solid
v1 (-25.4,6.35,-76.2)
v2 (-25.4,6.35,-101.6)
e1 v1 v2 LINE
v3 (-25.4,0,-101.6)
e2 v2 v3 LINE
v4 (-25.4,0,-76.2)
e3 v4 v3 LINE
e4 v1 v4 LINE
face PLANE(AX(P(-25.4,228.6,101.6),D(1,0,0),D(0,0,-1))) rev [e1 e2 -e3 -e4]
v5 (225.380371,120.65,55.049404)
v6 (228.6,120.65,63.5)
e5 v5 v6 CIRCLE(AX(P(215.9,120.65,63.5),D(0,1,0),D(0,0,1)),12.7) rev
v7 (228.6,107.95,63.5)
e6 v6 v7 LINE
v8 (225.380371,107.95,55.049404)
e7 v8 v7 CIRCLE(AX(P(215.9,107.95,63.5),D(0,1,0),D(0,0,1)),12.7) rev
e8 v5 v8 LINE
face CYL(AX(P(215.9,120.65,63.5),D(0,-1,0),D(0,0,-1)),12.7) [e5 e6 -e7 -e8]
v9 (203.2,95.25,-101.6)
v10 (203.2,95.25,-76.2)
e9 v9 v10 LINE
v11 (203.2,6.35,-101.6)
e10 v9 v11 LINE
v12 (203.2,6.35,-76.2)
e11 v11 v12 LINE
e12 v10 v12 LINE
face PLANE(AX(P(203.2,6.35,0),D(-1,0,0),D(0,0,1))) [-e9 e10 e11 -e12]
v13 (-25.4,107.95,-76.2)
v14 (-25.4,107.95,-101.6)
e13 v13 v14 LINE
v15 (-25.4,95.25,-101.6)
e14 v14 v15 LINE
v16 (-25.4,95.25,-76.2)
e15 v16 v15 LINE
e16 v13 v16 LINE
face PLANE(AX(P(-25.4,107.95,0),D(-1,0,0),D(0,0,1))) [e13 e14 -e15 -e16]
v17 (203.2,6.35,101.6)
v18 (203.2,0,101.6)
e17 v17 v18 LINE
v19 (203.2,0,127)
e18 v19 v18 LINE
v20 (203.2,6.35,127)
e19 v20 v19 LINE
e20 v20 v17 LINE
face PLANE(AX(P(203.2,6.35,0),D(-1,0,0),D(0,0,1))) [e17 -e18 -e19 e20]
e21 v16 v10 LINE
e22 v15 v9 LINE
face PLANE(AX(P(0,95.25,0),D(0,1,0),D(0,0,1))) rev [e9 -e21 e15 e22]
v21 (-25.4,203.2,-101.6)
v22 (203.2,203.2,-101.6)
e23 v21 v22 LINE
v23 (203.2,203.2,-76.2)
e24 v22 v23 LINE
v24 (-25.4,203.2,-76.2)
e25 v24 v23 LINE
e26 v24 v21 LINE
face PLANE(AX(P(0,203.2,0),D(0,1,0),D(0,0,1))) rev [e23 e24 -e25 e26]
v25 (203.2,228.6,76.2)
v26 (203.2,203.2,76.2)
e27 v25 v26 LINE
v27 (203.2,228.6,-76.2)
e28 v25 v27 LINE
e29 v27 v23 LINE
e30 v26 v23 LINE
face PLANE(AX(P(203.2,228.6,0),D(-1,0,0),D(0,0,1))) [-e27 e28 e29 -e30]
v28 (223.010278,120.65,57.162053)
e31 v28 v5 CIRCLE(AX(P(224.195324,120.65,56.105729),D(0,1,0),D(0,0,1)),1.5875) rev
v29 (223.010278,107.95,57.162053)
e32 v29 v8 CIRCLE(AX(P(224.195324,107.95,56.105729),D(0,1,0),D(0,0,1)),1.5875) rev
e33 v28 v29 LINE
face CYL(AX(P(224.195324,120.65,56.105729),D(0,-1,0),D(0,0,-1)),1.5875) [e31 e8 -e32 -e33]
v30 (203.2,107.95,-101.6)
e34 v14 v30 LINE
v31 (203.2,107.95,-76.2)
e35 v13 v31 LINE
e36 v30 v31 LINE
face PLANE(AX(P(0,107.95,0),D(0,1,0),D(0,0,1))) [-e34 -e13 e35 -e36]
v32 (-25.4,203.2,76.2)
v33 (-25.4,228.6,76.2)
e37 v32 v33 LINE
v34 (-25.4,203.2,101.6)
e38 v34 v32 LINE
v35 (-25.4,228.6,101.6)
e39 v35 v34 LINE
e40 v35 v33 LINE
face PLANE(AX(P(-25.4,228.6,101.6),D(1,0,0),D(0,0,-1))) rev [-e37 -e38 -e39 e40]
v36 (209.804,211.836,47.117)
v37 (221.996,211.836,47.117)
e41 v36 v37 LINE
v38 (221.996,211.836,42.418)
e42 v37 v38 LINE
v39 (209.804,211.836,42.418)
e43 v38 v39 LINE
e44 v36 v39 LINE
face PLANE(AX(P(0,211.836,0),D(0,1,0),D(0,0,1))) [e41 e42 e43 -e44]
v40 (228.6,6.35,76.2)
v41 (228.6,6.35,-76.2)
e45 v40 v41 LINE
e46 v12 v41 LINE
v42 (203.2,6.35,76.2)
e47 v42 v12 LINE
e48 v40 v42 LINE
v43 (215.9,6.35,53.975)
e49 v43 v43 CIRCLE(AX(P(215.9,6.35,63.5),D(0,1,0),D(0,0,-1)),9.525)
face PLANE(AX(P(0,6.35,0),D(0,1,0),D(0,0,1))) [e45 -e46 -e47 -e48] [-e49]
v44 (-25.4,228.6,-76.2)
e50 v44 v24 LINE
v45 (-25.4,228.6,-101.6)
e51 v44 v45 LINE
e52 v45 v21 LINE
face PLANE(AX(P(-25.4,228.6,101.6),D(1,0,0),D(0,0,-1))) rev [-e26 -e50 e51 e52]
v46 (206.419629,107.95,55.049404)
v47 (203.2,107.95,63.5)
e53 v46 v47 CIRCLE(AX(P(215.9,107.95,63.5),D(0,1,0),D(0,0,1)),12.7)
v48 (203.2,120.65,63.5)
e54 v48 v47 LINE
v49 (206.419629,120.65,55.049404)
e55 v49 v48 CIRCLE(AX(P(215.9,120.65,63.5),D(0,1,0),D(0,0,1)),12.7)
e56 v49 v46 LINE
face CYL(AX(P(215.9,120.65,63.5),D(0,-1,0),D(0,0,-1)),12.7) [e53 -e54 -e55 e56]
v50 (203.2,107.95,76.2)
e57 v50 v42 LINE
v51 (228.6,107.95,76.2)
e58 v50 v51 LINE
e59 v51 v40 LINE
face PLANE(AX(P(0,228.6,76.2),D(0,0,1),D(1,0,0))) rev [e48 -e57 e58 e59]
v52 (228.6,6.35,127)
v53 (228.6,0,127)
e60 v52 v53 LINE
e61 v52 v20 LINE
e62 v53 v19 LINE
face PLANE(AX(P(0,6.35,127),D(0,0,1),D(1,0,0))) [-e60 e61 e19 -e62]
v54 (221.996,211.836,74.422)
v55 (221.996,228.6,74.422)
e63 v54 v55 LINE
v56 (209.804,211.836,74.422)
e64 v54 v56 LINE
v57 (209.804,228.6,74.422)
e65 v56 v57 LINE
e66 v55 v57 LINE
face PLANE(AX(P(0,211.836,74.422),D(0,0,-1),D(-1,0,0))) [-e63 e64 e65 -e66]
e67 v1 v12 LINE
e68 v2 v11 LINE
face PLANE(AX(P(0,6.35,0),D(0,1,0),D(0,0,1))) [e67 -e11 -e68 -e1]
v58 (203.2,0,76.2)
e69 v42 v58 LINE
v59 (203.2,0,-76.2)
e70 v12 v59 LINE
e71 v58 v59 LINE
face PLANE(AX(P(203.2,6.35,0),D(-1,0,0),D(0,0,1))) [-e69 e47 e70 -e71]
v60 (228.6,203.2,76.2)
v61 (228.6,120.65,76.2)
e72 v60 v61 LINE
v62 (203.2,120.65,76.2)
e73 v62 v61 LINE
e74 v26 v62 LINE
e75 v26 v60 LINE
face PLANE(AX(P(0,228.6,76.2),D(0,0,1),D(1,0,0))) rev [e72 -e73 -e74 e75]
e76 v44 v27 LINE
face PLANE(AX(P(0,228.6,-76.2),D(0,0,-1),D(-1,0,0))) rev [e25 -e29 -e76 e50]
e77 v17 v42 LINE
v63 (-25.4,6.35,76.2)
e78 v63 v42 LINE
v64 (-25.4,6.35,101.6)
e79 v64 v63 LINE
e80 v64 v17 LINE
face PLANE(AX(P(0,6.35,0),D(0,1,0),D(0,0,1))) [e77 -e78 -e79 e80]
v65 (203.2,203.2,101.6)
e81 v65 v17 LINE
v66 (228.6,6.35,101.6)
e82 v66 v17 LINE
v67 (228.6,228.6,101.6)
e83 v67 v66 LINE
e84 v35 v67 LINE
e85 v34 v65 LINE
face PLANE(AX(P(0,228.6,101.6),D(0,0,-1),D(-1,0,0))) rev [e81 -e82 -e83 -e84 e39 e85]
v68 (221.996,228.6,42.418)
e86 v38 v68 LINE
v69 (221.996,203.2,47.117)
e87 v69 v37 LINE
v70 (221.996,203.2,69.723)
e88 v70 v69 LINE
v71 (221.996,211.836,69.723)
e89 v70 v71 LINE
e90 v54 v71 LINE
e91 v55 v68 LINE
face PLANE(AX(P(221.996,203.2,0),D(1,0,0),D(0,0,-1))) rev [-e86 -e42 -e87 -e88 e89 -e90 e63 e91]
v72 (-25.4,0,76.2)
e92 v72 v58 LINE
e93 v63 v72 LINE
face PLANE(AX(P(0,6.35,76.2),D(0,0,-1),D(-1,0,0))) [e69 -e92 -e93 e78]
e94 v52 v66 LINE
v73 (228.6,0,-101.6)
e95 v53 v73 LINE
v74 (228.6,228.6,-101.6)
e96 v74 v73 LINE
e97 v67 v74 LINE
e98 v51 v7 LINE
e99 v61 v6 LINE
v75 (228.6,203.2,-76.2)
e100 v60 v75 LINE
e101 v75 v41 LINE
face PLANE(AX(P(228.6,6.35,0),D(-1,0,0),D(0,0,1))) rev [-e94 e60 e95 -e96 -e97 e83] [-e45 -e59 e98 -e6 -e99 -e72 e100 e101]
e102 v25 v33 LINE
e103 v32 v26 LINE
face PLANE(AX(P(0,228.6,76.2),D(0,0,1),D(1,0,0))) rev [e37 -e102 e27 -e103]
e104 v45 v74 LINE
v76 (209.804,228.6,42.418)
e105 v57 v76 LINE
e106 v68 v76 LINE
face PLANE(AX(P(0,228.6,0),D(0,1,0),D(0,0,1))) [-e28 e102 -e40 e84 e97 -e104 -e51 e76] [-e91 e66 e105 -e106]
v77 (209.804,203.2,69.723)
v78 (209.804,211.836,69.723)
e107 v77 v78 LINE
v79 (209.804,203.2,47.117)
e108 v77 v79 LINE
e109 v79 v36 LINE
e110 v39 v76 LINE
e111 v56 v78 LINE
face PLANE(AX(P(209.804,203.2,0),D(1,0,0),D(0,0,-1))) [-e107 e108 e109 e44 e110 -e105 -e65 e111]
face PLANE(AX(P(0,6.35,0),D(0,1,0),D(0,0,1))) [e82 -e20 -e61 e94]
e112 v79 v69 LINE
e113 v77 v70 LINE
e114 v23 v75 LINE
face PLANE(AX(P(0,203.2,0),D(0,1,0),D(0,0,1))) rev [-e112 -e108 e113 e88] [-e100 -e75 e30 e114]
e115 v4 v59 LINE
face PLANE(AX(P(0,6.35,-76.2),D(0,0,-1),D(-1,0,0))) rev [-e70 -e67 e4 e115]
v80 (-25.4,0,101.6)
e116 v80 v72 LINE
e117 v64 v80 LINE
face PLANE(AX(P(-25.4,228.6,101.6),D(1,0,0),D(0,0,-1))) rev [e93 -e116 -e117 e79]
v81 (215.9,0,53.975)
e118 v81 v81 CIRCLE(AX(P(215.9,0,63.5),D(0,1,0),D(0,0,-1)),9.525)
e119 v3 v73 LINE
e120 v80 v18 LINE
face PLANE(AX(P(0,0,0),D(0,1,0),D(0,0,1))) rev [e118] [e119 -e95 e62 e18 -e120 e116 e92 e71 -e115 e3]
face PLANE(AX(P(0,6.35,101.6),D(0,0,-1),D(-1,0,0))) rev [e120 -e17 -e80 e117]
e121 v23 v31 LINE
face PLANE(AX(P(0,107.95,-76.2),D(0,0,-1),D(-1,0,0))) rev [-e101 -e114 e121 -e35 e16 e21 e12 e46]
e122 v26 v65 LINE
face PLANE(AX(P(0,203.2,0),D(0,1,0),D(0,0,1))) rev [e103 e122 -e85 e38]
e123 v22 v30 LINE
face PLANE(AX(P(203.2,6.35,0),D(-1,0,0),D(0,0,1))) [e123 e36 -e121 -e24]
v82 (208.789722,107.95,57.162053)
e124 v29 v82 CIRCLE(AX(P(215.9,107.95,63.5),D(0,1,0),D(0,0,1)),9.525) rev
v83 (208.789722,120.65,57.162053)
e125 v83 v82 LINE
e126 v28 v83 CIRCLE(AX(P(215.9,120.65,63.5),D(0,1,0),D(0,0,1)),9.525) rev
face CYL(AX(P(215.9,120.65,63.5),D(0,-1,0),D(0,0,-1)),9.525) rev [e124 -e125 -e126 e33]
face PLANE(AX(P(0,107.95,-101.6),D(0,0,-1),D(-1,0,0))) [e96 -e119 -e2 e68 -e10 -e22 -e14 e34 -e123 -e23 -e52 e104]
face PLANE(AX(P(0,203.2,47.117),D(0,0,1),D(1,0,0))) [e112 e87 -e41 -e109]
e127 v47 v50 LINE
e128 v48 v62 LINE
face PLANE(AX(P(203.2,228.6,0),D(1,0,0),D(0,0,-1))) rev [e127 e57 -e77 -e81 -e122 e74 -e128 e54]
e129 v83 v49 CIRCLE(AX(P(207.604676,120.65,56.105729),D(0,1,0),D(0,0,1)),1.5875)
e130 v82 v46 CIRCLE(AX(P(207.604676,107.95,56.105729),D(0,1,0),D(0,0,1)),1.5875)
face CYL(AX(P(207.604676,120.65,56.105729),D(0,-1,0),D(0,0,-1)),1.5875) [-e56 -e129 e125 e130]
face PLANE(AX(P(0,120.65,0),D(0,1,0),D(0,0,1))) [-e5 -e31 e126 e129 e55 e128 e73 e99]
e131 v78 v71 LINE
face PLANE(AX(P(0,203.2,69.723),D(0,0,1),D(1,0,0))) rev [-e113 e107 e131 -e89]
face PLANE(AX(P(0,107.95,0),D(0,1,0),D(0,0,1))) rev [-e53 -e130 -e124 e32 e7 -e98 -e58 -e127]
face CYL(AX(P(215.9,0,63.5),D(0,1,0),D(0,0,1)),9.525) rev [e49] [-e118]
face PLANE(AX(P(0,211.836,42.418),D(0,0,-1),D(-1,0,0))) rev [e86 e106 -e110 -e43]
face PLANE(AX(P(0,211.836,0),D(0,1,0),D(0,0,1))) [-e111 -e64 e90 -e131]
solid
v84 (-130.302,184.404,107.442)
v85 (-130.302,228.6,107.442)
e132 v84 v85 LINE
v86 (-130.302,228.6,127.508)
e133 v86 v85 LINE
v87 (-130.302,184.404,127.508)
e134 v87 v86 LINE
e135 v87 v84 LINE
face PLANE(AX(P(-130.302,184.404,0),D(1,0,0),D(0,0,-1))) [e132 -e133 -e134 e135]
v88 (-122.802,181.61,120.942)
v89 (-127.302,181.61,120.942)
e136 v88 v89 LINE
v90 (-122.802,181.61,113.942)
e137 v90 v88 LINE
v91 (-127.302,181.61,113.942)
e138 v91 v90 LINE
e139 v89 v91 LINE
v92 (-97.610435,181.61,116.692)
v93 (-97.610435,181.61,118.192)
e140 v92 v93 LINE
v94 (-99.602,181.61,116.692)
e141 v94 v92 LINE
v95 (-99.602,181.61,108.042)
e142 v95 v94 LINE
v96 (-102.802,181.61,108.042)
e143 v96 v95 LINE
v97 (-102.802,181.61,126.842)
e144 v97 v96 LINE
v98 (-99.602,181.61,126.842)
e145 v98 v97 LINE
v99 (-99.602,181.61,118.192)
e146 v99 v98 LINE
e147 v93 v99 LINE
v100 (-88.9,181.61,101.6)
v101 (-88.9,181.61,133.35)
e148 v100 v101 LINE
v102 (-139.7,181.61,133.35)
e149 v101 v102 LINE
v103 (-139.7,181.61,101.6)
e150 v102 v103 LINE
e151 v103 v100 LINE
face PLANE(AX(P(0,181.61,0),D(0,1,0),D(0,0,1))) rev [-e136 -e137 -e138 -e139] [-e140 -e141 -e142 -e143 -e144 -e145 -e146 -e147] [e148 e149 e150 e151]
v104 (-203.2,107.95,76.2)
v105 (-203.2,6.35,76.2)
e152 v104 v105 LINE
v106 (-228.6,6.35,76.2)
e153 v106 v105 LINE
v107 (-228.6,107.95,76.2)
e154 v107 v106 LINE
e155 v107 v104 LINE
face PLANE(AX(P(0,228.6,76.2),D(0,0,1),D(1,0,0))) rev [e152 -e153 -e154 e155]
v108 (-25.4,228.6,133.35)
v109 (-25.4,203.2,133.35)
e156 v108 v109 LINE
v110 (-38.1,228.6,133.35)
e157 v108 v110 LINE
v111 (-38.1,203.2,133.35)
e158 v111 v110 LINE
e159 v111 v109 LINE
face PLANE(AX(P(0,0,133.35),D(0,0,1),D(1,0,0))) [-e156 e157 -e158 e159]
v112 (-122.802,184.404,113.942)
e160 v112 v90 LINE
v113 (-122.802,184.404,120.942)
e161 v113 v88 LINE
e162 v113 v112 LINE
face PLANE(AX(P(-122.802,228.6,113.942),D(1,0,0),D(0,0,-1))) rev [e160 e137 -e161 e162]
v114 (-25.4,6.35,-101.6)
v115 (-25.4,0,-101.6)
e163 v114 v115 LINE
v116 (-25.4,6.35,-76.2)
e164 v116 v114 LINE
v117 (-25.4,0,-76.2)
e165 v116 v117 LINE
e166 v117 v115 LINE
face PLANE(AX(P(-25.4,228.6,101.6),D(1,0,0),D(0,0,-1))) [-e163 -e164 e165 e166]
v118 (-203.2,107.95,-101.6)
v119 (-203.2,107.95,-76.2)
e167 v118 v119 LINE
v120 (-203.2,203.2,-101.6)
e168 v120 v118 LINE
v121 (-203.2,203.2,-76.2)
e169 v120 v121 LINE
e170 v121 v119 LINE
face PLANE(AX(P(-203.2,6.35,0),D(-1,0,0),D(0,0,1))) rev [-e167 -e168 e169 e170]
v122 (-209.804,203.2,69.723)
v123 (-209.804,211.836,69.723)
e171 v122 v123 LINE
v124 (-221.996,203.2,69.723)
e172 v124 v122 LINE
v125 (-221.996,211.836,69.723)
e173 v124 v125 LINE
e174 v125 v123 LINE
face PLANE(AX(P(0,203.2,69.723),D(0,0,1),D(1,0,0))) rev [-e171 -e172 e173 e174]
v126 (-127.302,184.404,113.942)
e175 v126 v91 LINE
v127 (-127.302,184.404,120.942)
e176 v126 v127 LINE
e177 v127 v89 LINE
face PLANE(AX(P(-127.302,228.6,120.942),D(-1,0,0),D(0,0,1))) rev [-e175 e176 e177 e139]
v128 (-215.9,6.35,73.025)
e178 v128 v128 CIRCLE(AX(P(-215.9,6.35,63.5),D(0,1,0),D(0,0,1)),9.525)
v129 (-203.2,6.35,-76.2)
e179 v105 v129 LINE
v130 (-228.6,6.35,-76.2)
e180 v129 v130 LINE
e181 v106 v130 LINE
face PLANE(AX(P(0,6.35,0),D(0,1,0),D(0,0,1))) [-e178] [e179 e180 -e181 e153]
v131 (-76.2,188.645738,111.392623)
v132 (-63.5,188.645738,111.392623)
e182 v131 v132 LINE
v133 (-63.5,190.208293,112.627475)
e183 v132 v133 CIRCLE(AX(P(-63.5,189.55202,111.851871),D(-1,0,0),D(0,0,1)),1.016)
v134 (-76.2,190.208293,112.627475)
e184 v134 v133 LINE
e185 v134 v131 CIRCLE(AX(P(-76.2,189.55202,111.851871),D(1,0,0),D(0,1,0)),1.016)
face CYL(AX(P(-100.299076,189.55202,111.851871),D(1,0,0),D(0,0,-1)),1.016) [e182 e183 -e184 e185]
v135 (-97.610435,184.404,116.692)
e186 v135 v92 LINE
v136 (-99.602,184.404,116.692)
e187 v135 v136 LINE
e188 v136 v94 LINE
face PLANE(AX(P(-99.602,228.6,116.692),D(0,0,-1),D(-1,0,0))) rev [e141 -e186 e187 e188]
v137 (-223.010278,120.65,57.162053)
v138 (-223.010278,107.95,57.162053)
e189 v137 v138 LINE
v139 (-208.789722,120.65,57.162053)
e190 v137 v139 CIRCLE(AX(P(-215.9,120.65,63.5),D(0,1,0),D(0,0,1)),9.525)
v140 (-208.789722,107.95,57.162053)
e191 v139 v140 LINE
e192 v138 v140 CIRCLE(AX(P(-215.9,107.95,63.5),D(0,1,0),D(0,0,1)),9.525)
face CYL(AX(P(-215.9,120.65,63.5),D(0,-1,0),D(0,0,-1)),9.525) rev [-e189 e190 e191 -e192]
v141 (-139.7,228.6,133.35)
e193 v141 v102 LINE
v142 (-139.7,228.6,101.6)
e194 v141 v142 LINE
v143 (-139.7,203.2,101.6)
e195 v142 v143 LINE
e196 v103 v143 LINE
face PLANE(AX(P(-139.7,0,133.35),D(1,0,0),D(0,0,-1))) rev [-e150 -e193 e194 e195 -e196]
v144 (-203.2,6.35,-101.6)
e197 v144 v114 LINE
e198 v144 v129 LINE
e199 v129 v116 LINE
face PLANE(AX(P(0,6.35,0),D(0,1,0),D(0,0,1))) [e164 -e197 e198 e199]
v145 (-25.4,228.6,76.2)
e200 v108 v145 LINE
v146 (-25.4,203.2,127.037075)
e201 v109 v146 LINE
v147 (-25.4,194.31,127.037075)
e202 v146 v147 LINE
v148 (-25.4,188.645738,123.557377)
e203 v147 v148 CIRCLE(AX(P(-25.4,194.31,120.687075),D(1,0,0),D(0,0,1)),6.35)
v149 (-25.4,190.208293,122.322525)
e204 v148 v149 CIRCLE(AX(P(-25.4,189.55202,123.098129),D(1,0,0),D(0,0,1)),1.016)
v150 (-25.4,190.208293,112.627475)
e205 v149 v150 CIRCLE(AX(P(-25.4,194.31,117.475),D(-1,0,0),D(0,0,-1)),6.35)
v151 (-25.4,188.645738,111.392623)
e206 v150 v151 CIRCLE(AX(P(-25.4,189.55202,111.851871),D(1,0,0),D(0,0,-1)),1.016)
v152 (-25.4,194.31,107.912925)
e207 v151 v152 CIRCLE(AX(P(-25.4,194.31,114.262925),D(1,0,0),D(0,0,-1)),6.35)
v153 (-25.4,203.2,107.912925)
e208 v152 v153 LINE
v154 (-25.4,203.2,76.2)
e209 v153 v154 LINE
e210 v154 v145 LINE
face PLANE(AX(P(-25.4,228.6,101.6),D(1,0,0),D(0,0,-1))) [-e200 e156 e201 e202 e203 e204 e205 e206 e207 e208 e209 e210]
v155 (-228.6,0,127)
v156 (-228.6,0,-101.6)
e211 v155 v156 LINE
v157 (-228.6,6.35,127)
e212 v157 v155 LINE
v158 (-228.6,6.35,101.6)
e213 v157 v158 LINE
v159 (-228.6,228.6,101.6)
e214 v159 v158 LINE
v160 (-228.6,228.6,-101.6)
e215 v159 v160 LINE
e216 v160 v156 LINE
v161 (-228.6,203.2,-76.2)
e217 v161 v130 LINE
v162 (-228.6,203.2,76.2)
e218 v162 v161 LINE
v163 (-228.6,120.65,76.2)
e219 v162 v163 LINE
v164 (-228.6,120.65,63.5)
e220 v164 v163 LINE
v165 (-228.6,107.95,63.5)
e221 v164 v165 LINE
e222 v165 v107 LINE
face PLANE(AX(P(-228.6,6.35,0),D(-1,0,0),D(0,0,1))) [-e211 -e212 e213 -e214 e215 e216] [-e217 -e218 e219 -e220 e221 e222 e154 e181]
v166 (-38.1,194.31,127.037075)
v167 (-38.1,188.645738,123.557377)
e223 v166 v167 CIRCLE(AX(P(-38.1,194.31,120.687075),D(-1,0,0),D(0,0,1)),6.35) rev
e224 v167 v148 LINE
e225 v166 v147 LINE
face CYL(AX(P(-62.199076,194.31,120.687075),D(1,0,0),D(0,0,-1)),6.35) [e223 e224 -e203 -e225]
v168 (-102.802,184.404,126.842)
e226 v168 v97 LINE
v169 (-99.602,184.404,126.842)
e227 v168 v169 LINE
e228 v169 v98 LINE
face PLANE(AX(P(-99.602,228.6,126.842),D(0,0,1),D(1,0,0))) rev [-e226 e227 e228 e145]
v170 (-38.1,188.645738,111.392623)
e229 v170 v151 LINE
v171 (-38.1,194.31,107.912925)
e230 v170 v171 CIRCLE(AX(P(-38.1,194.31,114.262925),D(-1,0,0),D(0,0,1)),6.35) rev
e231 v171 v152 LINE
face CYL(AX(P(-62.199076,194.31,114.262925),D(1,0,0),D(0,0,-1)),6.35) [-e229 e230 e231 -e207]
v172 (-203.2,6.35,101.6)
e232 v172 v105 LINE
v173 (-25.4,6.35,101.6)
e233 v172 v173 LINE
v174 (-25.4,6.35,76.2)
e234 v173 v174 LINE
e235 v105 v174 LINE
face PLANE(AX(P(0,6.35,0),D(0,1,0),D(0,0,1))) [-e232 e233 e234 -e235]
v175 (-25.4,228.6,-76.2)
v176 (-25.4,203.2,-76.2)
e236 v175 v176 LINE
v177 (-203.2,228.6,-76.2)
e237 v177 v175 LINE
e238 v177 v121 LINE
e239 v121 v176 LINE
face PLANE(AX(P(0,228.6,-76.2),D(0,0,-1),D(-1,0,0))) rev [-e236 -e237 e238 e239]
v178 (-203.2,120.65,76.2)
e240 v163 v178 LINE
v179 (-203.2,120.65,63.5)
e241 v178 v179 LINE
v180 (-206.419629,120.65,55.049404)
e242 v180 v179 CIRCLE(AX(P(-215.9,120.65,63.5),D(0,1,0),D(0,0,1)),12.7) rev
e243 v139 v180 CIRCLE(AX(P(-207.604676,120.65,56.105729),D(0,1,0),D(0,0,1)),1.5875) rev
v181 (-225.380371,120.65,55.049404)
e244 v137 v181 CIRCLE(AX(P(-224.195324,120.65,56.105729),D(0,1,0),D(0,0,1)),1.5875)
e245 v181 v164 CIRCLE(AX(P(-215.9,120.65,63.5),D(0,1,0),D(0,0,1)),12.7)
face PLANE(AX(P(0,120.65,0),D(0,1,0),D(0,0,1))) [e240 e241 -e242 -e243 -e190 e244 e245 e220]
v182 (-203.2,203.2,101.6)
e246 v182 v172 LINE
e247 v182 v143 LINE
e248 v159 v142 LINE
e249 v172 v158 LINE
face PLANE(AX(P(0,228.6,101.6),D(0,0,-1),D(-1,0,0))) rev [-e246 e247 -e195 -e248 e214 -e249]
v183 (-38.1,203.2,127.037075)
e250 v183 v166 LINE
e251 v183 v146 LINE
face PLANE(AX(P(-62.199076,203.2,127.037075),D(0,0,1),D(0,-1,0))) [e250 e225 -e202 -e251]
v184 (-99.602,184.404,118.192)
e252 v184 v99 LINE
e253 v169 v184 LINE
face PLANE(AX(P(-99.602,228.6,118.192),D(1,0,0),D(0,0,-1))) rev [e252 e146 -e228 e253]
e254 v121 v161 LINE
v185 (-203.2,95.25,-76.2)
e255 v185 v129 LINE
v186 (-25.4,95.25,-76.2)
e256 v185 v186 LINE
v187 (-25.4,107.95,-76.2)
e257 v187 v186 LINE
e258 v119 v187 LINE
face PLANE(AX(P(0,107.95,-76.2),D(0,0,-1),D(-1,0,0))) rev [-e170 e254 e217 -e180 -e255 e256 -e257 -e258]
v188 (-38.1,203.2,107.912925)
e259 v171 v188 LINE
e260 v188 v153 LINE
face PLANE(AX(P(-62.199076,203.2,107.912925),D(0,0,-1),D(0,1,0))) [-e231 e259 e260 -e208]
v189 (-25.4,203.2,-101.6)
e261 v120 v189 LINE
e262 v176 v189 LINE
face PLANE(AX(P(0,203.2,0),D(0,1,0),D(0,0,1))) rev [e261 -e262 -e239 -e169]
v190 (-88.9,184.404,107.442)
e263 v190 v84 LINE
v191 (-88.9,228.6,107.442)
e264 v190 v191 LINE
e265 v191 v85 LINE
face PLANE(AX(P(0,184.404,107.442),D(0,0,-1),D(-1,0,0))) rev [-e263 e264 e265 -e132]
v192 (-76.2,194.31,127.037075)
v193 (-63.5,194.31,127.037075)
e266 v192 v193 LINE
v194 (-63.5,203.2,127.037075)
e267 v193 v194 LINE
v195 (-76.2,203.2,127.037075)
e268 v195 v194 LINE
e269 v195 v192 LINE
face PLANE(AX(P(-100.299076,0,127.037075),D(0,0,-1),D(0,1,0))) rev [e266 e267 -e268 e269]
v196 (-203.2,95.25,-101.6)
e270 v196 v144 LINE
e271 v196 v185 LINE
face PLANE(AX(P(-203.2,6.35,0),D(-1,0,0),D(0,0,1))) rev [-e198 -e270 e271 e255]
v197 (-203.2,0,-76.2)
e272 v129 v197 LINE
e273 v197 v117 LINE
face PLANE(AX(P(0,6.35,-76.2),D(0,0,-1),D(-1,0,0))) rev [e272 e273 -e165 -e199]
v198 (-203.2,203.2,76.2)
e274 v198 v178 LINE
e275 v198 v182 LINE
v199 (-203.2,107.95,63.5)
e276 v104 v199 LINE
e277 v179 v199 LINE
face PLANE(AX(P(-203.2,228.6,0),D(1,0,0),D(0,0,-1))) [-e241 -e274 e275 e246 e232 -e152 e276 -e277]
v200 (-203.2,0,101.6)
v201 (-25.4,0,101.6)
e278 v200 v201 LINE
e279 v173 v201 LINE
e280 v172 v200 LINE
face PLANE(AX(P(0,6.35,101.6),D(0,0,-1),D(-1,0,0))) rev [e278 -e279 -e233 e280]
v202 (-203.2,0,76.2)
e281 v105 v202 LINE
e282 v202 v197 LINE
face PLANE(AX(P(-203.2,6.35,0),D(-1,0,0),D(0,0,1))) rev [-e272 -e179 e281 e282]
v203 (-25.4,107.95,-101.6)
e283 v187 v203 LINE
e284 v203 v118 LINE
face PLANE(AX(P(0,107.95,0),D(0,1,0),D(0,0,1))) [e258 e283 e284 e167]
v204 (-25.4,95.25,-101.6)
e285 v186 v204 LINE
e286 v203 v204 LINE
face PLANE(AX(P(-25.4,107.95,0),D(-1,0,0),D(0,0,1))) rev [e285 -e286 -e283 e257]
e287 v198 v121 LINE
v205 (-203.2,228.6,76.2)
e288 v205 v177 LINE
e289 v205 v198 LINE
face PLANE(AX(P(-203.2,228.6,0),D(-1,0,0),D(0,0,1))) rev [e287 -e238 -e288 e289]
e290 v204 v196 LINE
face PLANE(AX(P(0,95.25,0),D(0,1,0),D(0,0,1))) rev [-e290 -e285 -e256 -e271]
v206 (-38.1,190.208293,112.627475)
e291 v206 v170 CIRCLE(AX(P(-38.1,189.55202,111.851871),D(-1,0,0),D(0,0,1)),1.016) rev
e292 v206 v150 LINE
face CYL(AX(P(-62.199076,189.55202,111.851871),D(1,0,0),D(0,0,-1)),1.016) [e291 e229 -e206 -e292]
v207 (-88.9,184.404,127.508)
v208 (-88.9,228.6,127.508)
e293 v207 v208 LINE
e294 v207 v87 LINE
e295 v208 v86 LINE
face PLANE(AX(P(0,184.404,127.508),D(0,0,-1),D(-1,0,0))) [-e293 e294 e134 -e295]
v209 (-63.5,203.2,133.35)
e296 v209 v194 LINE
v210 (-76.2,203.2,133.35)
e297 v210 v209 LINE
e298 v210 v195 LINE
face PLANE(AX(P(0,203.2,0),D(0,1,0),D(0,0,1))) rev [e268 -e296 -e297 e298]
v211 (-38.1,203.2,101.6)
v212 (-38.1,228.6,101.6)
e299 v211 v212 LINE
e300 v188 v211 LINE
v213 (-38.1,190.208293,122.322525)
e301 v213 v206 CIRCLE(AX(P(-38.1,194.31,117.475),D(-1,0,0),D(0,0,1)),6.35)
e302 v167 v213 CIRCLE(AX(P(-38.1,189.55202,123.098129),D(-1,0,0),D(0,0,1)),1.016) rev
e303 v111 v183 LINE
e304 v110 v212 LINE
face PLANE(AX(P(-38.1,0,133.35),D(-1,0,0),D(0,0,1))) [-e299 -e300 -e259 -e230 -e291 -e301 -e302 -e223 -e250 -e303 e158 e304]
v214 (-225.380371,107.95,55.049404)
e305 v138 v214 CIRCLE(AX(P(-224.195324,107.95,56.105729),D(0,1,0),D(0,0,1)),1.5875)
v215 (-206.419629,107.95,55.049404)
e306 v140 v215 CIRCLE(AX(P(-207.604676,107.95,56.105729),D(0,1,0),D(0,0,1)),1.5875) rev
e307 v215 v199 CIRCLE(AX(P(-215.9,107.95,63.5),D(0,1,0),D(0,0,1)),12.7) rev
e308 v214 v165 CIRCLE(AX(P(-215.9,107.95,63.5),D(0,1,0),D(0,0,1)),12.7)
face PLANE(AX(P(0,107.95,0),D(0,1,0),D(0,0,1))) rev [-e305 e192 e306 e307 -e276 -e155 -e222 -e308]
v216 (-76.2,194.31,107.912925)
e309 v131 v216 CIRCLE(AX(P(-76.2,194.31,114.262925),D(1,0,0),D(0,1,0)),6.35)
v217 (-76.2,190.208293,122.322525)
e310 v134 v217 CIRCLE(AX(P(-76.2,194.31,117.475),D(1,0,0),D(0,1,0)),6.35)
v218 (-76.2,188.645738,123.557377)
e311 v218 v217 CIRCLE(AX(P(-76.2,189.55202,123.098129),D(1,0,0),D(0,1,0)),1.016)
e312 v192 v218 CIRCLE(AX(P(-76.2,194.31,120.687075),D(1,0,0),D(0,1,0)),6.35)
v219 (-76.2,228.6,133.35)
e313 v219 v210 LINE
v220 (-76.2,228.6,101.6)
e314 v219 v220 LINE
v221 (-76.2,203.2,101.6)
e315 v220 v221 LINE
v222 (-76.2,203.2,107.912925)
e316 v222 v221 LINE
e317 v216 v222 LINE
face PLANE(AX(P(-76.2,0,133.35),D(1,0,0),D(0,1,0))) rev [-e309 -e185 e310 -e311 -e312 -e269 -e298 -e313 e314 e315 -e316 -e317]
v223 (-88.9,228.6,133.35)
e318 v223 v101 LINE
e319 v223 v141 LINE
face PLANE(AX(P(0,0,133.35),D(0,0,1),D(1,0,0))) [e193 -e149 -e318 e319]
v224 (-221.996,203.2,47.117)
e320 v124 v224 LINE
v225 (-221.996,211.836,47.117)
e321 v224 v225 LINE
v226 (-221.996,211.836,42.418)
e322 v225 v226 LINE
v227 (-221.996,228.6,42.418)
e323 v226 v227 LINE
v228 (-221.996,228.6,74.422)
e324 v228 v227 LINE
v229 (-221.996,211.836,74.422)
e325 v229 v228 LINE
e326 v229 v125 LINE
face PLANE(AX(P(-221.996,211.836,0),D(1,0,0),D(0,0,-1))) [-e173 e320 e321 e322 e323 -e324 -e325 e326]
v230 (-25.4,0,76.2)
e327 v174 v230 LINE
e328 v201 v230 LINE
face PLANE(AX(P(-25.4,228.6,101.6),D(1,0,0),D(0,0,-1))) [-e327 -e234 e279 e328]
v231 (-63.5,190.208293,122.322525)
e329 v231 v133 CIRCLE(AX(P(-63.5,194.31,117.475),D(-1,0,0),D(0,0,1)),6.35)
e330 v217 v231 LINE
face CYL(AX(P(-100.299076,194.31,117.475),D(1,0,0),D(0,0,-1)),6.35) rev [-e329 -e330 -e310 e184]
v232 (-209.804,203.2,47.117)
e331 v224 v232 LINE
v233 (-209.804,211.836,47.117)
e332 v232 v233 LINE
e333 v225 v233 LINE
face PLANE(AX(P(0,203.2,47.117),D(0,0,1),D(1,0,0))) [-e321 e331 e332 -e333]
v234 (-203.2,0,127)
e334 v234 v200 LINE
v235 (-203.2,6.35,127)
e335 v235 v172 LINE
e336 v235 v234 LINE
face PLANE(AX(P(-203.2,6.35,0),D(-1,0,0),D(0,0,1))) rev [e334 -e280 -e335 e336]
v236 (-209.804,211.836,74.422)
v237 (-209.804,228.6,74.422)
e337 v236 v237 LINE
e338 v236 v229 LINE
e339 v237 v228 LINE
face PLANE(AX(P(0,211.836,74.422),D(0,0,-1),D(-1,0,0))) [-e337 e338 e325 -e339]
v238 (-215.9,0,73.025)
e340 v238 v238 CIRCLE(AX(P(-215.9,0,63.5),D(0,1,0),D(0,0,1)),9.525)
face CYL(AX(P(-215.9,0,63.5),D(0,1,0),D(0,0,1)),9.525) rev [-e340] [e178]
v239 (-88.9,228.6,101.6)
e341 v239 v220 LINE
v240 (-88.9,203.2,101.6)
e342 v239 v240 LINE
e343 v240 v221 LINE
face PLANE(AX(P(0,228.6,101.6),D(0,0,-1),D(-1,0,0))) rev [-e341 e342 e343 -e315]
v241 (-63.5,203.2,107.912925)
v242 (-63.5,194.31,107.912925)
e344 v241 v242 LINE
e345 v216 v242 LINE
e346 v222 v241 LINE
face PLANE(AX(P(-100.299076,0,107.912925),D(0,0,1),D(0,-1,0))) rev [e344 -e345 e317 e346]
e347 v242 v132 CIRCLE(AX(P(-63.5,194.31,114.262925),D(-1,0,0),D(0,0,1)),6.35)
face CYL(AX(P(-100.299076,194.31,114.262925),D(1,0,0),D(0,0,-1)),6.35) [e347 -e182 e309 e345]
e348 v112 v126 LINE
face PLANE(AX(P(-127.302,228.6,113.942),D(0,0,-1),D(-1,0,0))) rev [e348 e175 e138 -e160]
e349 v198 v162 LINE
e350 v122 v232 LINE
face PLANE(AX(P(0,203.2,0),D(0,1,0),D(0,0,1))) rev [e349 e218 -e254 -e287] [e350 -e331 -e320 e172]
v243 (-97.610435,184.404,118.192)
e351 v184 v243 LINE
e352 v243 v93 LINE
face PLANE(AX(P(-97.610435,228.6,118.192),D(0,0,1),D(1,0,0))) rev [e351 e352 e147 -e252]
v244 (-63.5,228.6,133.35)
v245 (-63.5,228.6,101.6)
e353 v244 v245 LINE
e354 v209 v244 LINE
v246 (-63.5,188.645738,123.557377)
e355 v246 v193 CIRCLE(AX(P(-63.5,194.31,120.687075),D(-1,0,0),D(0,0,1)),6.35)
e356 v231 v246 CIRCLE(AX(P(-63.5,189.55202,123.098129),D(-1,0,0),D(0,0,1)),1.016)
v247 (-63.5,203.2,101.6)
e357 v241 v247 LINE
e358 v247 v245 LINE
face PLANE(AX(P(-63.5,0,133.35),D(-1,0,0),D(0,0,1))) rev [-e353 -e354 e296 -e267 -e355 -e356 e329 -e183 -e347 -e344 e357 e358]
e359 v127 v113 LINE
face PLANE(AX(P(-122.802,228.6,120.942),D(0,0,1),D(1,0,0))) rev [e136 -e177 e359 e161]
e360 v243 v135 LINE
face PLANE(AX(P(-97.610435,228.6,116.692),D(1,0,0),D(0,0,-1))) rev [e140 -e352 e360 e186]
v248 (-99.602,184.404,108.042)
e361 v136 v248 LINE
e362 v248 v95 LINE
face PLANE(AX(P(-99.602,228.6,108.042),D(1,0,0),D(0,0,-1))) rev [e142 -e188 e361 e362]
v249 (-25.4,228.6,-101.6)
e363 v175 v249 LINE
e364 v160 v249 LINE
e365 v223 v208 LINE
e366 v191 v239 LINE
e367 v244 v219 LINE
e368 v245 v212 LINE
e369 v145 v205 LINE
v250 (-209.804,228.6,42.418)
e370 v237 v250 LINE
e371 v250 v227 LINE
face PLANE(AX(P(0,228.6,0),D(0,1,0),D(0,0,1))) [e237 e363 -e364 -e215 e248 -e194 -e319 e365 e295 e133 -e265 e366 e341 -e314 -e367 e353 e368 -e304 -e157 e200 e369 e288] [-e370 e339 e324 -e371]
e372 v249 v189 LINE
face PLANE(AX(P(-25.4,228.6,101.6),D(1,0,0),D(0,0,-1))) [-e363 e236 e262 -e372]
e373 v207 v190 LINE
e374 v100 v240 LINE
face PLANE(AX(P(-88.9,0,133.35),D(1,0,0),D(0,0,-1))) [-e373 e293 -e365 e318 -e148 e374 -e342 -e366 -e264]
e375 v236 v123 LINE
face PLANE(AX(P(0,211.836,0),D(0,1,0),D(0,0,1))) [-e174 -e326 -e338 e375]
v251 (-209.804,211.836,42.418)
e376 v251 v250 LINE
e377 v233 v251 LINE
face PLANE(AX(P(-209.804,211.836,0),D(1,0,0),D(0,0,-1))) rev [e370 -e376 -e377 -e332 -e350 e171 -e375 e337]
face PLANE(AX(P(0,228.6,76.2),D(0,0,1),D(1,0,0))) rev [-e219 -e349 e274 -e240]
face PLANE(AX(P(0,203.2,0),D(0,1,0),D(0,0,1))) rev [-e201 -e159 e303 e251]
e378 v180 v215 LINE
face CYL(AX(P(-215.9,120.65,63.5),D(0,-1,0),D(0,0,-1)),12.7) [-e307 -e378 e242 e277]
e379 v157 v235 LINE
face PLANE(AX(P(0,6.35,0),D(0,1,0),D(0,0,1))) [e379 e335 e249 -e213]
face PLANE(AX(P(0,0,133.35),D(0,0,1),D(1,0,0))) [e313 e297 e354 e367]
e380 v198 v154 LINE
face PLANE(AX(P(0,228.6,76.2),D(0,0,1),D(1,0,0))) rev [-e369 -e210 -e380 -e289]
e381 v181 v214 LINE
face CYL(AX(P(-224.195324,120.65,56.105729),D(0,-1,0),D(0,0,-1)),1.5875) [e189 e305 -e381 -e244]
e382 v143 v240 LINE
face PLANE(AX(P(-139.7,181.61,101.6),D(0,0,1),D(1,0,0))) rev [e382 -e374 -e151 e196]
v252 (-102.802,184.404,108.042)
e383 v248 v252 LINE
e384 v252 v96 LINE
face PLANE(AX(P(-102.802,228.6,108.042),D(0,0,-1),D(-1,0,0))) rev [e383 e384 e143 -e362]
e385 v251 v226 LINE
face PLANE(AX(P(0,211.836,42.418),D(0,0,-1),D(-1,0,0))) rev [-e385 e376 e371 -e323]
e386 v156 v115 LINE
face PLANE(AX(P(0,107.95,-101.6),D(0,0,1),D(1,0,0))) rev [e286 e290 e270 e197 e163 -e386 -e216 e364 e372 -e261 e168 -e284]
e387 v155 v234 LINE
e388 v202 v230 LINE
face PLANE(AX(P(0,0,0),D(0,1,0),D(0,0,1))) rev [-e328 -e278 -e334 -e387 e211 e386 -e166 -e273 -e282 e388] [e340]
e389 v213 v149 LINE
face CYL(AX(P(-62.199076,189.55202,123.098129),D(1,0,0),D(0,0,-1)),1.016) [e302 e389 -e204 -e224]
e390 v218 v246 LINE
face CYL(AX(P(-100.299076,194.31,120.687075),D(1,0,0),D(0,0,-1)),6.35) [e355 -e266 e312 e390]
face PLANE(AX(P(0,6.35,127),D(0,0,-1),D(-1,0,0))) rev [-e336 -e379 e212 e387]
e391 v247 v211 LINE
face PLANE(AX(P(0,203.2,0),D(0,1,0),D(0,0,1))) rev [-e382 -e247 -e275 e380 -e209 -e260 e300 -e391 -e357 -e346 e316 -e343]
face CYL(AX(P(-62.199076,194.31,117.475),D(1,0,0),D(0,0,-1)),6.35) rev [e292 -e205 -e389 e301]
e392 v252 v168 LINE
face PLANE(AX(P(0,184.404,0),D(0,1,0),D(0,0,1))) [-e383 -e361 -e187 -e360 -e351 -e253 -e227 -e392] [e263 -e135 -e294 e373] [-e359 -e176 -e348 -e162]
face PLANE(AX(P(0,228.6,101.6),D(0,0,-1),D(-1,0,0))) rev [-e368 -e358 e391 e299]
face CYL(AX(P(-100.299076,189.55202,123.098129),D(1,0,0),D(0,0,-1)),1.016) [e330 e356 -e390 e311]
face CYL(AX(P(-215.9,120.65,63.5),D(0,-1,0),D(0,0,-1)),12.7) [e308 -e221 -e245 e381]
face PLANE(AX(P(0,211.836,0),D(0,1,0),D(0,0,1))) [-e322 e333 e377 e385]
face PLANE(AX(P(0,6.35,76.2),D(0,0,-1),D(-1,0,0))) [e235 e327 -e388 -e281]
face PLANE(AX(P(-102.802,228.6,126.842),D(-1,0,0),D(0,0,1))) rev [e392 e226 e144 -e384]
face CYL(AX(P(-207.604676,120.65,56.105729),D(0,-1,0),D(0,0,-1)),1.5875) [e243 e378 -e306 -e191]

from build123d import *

# Parameters (mm, degrees)
SKETCH1_W            = 25.4
SKETCH1_H            = 25.4
SKETCH1_W_2          = 406.4
SKETCH1_H_2          = 152.4
BOSS_EXTRUDE1_DEPTH  = 6.35
SKETCH1_4_W          = 25.4
SKETCH1_4_H          = 25.4
BOSS_EXTRUDE2_DEPTH  = 228.6
BOSS_EXTRUDE3_START  = 203.2
SKETCH1_5_W          = 406.4
SKETCH1_5_H          = 25.4
SKETCH1_5_W_2        = 25.4
SKETCH1_5_H_2        = 152.4
BOSS_EXTRUDE3_DEPTH  = 25.4
SKETCH2_W            = 50.8
SKETCH2_H            = 25.4
SKETCH2_W_2          = 12.7
BOSS_EXTRUDE4_DEPTH  = 31.75
SKETCH11_R           = 9.525
CUT_EXTRUDE6_DEPTH   = 346.594046534
SKETCH12_W           = 12.192
SKETCH12_H           = 22.606
SKETCH12_H_2         = 4.699
CUT_EXTRUDE7_DEPTH   = 16.764
SKETCH12_3_W         = 12.192
SKETCH12_3_H         = 22.606
CUT_EXTRUDE8_DEPTH   = 25.4
SKETCH13_W           = 12.192
SKETCH13_H           = 22.606
CUT_EXTRUDE9_DEPTH   = 25.4
SKETCH13_3_W         = 12.192
SKETCH13_3_H         = 4.699
CUT_EXTRUDE10_DEPTH  = 16.764
BOSS_EXTRUDE7_START  = 88.9
SKETCH14_W           = 177.8
SKETCH14_H           = 25.4
BOSS_EXTRUDE7_DEPTH  = 12.7
BOSS_EXTRUDE8_START  = 88.9
SKETCH14_3_W         = 228.6
SKETCH14_3_H         = 25.4
BOSS_EXTRUDE8_DEPTH  = 12.7
BOSS_EXTRUDE9_START  = 101.6
BOSS_EXTRUDE9_DEPTH  = 12.7
BOSS_EXTRUDE10_START = 101.6
BOSS_EXTRUDE10_DEPTH = 12.7
BOSS_EXTRUDE11_START = -12.7
BOSS_EXTRUDE11_DEPTH = 12.7
BOSS_EXTRUDE12_START = -38.1
BOSS_EXTRUDE12_DEPTH = 12.7
SKETCH18_W           = 50.8
SKETCH18_H           = 31.75
BOSS_EXTRUDE13_DEPTH = 21.59
SKETCH19_W           = 41.402
SKETCH19_H           = 20.066
CUT_EXTRUDE11_DEPTH  = 44.196
SKETCH20_W           = 4.5
SKETCH20_H           = 7
CUT_EXTRUDE13_DEPTH  = 321.970987162


# Read off the part's stored shape, not the designer's step: Split1, Boss-Extrude11
with BuildPart() as part:
    # Sketch1 → Boss-Extrude1 (new body)
    with BuildSketch(Plane(origin=(0, 0, 0), x_dir=(1, 0, 0), z_dir=(0, 1, 0))):
        with Locations((-215.9, -88.9)):
            Rectangle(SKETCH1_W, SKETCH1_H)
        with Locations((-215.9, -114.3)):
            Rectangle(SKETCH1_W, SKETCH1_H)
        with Locations((0, -88.9)):
            Rectangle(SKETCH1_W_2, SKETCH1_H)
        with Locations((215.9, -88.9)):
            Rectangle(SKETCH1_W, SKETCH1_H)
        with Locations((215.9, -114.3)):
            Rectangle(SKETCH1_W, SKETCH1_H)
        with Locations((0, 88.9)):
            Rectangle(SKETCH1_W_2, SKETCH1_H)
        with Locations((-215.9, 0)):
            Rectangle(SKETCH1_W, SKETCH1_H_2)
        with Locations((215.9, 0)):
            Rectangle(SKETCH1_W, SKETCH1_H_2)
    extrude(amount=BOSS_EXTRUDE1_DEPTH)

    # Sketch1<4> → Boss-Extrude2 (add)
    with BuildSketch(Plane(origin=(0, 0, 0), x_dir=(1, 0, 0), z_dir=(0, 1, 0))):
        with Locations((-215.9, -88.9)):
            Rectangle(SKETCH1_4_W, SKETCH1_4_H)
        with Locations((215.9, -88.9)):
            Rectangle(SKETCH1_4_W, SKETCH1_4_H)
        with Locations((215.9, 88.9)):
            Rectangle(SKETCH1_4_W, SKETCH1_4_H)
        with Locations((-215.9, 88.9)):
            Rectangle(SKETCH1_4_W, SKETCH1_4_H)
    extrude(amount=BOSS_EXTRUDE2_DEPTH)

    # Sketch1<5> → Boss-Extrude3 (add)
    with BuildSketch(Plane(origin=(0, 0, 0), x_dir=(1, 0, 0), z_dir=(0, 1, 0)).offset(BOSS_EXTRUDE3_START)):
        with Locations((0, 88.9)):
            Rectangle(SKETCH1_5_W, SKETCH1_5_H)
        with Locations((0, -88.9)):
            Rectangle(SKETCH1_5_W, SKETCH1_5_H)
        with Locations((-215.9, 0)):
            Rectangle(SKETCH1_5_W_2, SKETCH1_5_H_2)
        with Locations((215.9, 0)):
            Rectangle(SKETCH1_5_W_2, SKETCH1_5_H_2)
    extrude(amount=BOSS_EXTRUDE3_DEPTH)

    # Sketch2 → Boss-Extrude4 (add)
    with BuildSketch(Plane.XY.offset(101.6)):
        with Locations((-114.3, 215.9)):
            Rectangle(SKETCH2_W, SKETCH2_H)
        with Locations((-69.85, 215.9)):
            Rectangle(SKETCH2_W_2, SKETCH2_H)
        with Locations((-31.75, 215.9)):
            Rectangle(SKETCH2_W_2, SKETCH2_H)
    extrude(amount=BOSS_EXTRUDE4_DEPTH)


with BuildPart() as body_2:
    # Split1: the piece on the far side of the plane
    add(part.part)
    split(bisect_by=Plane.YZ.offset(-25.4), keep=Keep.BOTTOM)


with BuildPart() as part_1:
    add(part.part)

    # Split1
    split(bisect_by=Plane.YZ.offset(-25.4), keep=Keep.TOP)


with BuildPart() as cut_extrude6_tool:
    # Sketch11 → Cut-Extrude6 (new, through all)
    with BuildSketch(Plane(origin=(0, 6.35, 0), x_dir=(1, 0, 0), z_dir=(0, 1, 0))):
        with Locations(Location((-215.9, -63.5, 0), (0, 0, 270))):
            Circle(SKETCH11_R)
        with Locations(Location((215.9, -63.5, 0), (0, 0, 90))):
            Circle(SKETCH11_R)
    extrude(amount=-CUT_EXTRUDE6_DEPTH)


with BuildPart() as part_2:
    add(part_1.part)

    # Cut-Extrude6: cut by cut_extrude6_tool
    add(cut_extrude6_tool.part, mode=Mode.SUBTRACT)

    # Sketch13 → Cut-Extrude9 (cut)
    with BuildSketch(Plane(origin=(0, 228.6, 0), x_dir=(1, 0, 0), z_dir=(0, 1, 0))):
        with Locations((215.9, -58.42)):
            Rectangle(SKETCH13_W, SKETCH13_H)
    extrude(amount=-CUT_EXTRUDE9_DEPTH, mode=Mode.SUBTRACT)

    # Sketch13<3> → Cut-Extrude10 (cut)
    with BuildSketch(Plane(origin=(0, 228.6, 0), x_dir=(1, 0, 0), z_dir=(0, 1, 0))):
        with Locations((215.9, -44.7675)):
            Rectangle(SKETCH13_3_W, SKETCH13_3_H)
        with Locations((215.9, -72.0725)):
            Rectangle(SKETCH13_3_W, SKETCH13_3_H)
    extrude(amount=-CUT_EXTRUDE10_DEPTH, mode=Mode.SUBTRACT)


with BuildPart() as body_2_1:
    add(body_2.part)

    # Cut-Extrude6: cut by cut_extrude6_tool
    add(cut_extrude6_tool.part, mode=Mode.SUBTRACT)

    # Sketch12 → Cut-Extrude7 (cut)
    with BuildSketch(Plane(origin=(0, 228.6, 0), x_dir=(1, 0, 0), z_dir=(0, 1, 0))):
        with Locations((-215.9, -58.42)):
            Rectangle(SKETCH12_W, SKETCH12_H)
        with Locations((-215.9, -44.7675)):
            Rectangle(SKETCH12_W, SKETCH12_H_2)
        with Locations((-215.9, -72.0725)):
            Rectangle(SKETCH12_W, SKETCH12_H_2)
    extrude(amount=-CUT_EXTRUDE7_DEPTH, mode=Mode.SUBTRACT)

    # Sketch12<3> → Cut-Extrude8 (cut)
    with BuildSketch(Plane(origin=(0, 228.6, 0), x_dir=(1, 0, 0), z_dir=(0, 1, 0))):
        with Locations((-215.9, -58.42)):
            Rectangle(SKETCH12_3_W, SKETCH12_3_H)
    extrude(amount=-CUT_EXTRUDE8_DEPTH, mode=Mode.SUBTRACT)


with BuildPart() as body_3:
    # Sketch14 → Boss-Extrude7 (new body)
    with BuildSketch(Plane(origin=(0, 6.35, 0), x_dir=(1, 0, 0), z_dir=(0, 1, 0)).offset(BOSS_EXTRUDE7_START)):
        with Locations((-114.3, 88.9)):
            Rectangle(SKETCH14_W, SKETCH14_H)
    extrude(amount=BOSS_EXTRUDE7_DEPTH)

    # Combine1: union body 2
    add(body_2_1.part)

    # Sketch16<3> → Boss-Extrude10 (add)
    with BuildSketch(Plane(origin=(0, 6.35, 0), x_dir=(1, 0, 0), z_dir=(0, 1, 0)).offset(BOSS_EXTRUDE10_START)):
        with BuildLine():
            Line((-228.6, -76.2), (-203.2, -76.2))
            Line((-203.2, -76.2), (-203.2, -63.5))
            ThreePointArc((-203.2, -63.5), (-204.032171439, -58.978424472), (-206.419629175, -55.049404222))
            ThreePointArc((-206.419629175, -55.049404222), (-208.661, -54.920682341), (-208.789721881, -57.162053166))
            ThreePointArc((-208.789721881, -57.162053166), (-215.9, -73.025), (-223.010278119, -57.162053166))
            ThreePointArc((-223.010278119, -57.162053166), (-223.139, -54.920682341), (-225.380370825, -55.049404222))
            ThreePointArc((-225.380370825, -55.049404222), (-227.767828561, -58.978424472), (-228.6, -63.5))
            Line((-228.6, -63.5), (-228.6, -76.2))
        make_face()
    extrude(amount=BOSS_EXTRUDE10_DEPTH)


with BuildPart() as body_3_2:
    # Sketch14<3> → Boss-Extrude8 (new body)
    with BuildSketch(Plane(origin=(0, 6.35, 0), x_dir=(1, 0, 0), z_dir=(0, 1, 0)).offset(BOSS_EXTRUDE8_START)):
        with Locations((88.9, 88.9)):
            Rectangle(SKETCH14_3_W, SKETCH14_3_H)
    extrude(amount=BOSS_EXTRUDE8_DEPTH)

    # Combine2: union part
    add(part_2.part)

    # Sketch16 → Boss-Extrude9 (add)
    with BuildSketch(Plane(origin=(0, 6.35, 0), x_dir=(1, 0, 0), z_dir=(0, 1, 0)).offset(BOSS_EXTRUDE9_START)):
        with BuildLine():
            Line((228.6, -76.2), (228.6, -63.5))
            ThreePointArc((228.6, -63.5), (227.767828561, -58.978424472), (225.380370825, -55.049404222))
            ThreePointArc((225.380370825, -55.049404222), (223.139, -54.920682341), (223.010278119, -57.162053166))
            ThreePointArc((223.010278119, -57.162053166), (215.9, -73.025), (208.789721881, -57.162053166))
            ThreePointArc((208.789721881, -57.162053166), (208.661, -54.920682341), (206.419629175, -55.049404222))
            ThreePointArc((206.419629175, -55.049404222), (204.032171439, -58.978424472), (203.2, -63.5))
            Line((203.2, -63.5), (203.2, -76.2))
            Line((203.2, -76.2), (228.6, -76.2))
        make_face()
    extrude(amount=BOSS_EXTRUDE9_DEPTH)


with BuildPart() as body_3_3:
    # Boss-Extrude11 outline → Boss-Extrude11 (new body)
    with BuildSketch(Plane(origin=(-25.4, 0, 0), x_dir=(0, 0, -1), z_dir=(1, 0, 0)).offset(BOSS_EXTRUDE11_START)):
        with BuildLine():
            Line((-107.912924793, 194.31), (-107.912924793, 203.2))
            Line((-107.912924793, 203.2), (-127.037075207, 203.2))
            Line((-127.037075207, 203.2), (-127.037075207, 194.31))
            ThreePointArc((-127.037075207, 194.31), (-126.097662943, 190.986140746), (-123.557377461, 188.645737915))
            ThreePointArc((-123.557377461, 188.645737915), (-122.301, 188.922066518), (-122.322525086, 190.208292973))
            ThreePointArc((-122.322525086, 190.208292973), (-117.475, 200.66), (-112.627474914, 190.208292973))
            ThreePointArc((-112.627474914, 190.208292973), (-112.649, 188.922066518), (-111.392622539, 188.645737915))
            ThreePointArc((-111.392622539, 188.645737915), (-108.852337057, 190.986140746), (-107.912924793, 194.31))
        make_face()
    extrude(amount=BOSS_EXTRUDE11_DEPTH)


with BuildPart() as body_4:
    # Sketch17<2> → Boss-Extrude12 (new body)
    with BuildSketch(Plane(origin=(-25.4, 0, 0), x_dir=(0, 0, -1), z_dir=(1, 0, 0)).offset(BOSS_EXTRUDE12_START)):
        with BuildLine():
            Line((-107.912924793, 203.2), (-127.037075207, 203.2))
            Line((-127.037075207, 203.2), (-127.037075207, 194.31))
            ThreePointArc((-127.037075207, 194.31), (-126.097662943, 190.986140745), (-123.557377461, 188.645737915))
            ThreePointArc((-123.557377461, 188.645737915), (-122.301, 188.922066518), (-122.322525086, 190.208292973))
            ThreePointArc((-122.322525086, 190.208292973), (-117.475, 200.66), (-112.627474914, 190.208292973))
            ThreePointArc((-112.627474914, 190.208292973), (-112.649, 188.922066518), (-111.392622539, 188.645737915))
            ThreePointArc((-111.392622539, 188.645737915), (-108.852337057, 190.986140745), (-107.912924793, 194.31))
            Line((-107.912924793, 194.31), (-107.912924793, 203.2))
        make_face()
    extrude(amount=-BOSS_EXTRUDE12_DEPTH)


with BuildPart() as body_5:
    # Sketch18 → Boss-Extrude13 (new body)
    with BuildSketch(Plane.XZ.offset(-203.2)):
        with Locations((-114.3, 117.475)):
            Rectangle(SKETCH18_W, SKETCH18_H)
    extrude(amount=BOSS_EXTRUDE13_DEPTH)


with BuildPart() as body_3_1:
    add(body_3.part)

    # Combine3: union body 3 3, body 5, body 4
    add(body_3_3.part)
    add(body_5.part)
    add(body_4.part)

    # Sketch19 → Cut-Extrude11 (cut)
    with BuildSketch(Plane(origin=(0, 228.6, 0), x_dir=(1, 0, 0), z_dir=(0, 1, 0))):
        with Locations((-109.601, -117.475)):
            Rectangle(SKETCH19_W, SKETCH19_H)
    extrude(amount=-CUT_EXTRUDE11_DEPTH, mode=Mode.SUBTRACT)

    # Sketch20 → Cut-Extrude13 (cut, through all)
    with BuildSketch(Plane.XZ.offset(-181.61)):
        Polygon((-97.610434743, 116.692), (-97.610434743, 118.192), (-99.602, 118.192), (-99.602, 126.842), (-102.802, 126.842), (-102.802, 108.042), (-99.602, 108.042), (-99.602, 116.692), align=None)
        with Locations((-125.052, 117.442)):
            Rectangle(SKETCH20_W, SKETCH20_H)
    extrude(amount=-CUT_EXTRUDE13_DEPTH, mode=Mode.SUBTRACT)


solid = Compound([body_3_2.part, body_3_1.part])
